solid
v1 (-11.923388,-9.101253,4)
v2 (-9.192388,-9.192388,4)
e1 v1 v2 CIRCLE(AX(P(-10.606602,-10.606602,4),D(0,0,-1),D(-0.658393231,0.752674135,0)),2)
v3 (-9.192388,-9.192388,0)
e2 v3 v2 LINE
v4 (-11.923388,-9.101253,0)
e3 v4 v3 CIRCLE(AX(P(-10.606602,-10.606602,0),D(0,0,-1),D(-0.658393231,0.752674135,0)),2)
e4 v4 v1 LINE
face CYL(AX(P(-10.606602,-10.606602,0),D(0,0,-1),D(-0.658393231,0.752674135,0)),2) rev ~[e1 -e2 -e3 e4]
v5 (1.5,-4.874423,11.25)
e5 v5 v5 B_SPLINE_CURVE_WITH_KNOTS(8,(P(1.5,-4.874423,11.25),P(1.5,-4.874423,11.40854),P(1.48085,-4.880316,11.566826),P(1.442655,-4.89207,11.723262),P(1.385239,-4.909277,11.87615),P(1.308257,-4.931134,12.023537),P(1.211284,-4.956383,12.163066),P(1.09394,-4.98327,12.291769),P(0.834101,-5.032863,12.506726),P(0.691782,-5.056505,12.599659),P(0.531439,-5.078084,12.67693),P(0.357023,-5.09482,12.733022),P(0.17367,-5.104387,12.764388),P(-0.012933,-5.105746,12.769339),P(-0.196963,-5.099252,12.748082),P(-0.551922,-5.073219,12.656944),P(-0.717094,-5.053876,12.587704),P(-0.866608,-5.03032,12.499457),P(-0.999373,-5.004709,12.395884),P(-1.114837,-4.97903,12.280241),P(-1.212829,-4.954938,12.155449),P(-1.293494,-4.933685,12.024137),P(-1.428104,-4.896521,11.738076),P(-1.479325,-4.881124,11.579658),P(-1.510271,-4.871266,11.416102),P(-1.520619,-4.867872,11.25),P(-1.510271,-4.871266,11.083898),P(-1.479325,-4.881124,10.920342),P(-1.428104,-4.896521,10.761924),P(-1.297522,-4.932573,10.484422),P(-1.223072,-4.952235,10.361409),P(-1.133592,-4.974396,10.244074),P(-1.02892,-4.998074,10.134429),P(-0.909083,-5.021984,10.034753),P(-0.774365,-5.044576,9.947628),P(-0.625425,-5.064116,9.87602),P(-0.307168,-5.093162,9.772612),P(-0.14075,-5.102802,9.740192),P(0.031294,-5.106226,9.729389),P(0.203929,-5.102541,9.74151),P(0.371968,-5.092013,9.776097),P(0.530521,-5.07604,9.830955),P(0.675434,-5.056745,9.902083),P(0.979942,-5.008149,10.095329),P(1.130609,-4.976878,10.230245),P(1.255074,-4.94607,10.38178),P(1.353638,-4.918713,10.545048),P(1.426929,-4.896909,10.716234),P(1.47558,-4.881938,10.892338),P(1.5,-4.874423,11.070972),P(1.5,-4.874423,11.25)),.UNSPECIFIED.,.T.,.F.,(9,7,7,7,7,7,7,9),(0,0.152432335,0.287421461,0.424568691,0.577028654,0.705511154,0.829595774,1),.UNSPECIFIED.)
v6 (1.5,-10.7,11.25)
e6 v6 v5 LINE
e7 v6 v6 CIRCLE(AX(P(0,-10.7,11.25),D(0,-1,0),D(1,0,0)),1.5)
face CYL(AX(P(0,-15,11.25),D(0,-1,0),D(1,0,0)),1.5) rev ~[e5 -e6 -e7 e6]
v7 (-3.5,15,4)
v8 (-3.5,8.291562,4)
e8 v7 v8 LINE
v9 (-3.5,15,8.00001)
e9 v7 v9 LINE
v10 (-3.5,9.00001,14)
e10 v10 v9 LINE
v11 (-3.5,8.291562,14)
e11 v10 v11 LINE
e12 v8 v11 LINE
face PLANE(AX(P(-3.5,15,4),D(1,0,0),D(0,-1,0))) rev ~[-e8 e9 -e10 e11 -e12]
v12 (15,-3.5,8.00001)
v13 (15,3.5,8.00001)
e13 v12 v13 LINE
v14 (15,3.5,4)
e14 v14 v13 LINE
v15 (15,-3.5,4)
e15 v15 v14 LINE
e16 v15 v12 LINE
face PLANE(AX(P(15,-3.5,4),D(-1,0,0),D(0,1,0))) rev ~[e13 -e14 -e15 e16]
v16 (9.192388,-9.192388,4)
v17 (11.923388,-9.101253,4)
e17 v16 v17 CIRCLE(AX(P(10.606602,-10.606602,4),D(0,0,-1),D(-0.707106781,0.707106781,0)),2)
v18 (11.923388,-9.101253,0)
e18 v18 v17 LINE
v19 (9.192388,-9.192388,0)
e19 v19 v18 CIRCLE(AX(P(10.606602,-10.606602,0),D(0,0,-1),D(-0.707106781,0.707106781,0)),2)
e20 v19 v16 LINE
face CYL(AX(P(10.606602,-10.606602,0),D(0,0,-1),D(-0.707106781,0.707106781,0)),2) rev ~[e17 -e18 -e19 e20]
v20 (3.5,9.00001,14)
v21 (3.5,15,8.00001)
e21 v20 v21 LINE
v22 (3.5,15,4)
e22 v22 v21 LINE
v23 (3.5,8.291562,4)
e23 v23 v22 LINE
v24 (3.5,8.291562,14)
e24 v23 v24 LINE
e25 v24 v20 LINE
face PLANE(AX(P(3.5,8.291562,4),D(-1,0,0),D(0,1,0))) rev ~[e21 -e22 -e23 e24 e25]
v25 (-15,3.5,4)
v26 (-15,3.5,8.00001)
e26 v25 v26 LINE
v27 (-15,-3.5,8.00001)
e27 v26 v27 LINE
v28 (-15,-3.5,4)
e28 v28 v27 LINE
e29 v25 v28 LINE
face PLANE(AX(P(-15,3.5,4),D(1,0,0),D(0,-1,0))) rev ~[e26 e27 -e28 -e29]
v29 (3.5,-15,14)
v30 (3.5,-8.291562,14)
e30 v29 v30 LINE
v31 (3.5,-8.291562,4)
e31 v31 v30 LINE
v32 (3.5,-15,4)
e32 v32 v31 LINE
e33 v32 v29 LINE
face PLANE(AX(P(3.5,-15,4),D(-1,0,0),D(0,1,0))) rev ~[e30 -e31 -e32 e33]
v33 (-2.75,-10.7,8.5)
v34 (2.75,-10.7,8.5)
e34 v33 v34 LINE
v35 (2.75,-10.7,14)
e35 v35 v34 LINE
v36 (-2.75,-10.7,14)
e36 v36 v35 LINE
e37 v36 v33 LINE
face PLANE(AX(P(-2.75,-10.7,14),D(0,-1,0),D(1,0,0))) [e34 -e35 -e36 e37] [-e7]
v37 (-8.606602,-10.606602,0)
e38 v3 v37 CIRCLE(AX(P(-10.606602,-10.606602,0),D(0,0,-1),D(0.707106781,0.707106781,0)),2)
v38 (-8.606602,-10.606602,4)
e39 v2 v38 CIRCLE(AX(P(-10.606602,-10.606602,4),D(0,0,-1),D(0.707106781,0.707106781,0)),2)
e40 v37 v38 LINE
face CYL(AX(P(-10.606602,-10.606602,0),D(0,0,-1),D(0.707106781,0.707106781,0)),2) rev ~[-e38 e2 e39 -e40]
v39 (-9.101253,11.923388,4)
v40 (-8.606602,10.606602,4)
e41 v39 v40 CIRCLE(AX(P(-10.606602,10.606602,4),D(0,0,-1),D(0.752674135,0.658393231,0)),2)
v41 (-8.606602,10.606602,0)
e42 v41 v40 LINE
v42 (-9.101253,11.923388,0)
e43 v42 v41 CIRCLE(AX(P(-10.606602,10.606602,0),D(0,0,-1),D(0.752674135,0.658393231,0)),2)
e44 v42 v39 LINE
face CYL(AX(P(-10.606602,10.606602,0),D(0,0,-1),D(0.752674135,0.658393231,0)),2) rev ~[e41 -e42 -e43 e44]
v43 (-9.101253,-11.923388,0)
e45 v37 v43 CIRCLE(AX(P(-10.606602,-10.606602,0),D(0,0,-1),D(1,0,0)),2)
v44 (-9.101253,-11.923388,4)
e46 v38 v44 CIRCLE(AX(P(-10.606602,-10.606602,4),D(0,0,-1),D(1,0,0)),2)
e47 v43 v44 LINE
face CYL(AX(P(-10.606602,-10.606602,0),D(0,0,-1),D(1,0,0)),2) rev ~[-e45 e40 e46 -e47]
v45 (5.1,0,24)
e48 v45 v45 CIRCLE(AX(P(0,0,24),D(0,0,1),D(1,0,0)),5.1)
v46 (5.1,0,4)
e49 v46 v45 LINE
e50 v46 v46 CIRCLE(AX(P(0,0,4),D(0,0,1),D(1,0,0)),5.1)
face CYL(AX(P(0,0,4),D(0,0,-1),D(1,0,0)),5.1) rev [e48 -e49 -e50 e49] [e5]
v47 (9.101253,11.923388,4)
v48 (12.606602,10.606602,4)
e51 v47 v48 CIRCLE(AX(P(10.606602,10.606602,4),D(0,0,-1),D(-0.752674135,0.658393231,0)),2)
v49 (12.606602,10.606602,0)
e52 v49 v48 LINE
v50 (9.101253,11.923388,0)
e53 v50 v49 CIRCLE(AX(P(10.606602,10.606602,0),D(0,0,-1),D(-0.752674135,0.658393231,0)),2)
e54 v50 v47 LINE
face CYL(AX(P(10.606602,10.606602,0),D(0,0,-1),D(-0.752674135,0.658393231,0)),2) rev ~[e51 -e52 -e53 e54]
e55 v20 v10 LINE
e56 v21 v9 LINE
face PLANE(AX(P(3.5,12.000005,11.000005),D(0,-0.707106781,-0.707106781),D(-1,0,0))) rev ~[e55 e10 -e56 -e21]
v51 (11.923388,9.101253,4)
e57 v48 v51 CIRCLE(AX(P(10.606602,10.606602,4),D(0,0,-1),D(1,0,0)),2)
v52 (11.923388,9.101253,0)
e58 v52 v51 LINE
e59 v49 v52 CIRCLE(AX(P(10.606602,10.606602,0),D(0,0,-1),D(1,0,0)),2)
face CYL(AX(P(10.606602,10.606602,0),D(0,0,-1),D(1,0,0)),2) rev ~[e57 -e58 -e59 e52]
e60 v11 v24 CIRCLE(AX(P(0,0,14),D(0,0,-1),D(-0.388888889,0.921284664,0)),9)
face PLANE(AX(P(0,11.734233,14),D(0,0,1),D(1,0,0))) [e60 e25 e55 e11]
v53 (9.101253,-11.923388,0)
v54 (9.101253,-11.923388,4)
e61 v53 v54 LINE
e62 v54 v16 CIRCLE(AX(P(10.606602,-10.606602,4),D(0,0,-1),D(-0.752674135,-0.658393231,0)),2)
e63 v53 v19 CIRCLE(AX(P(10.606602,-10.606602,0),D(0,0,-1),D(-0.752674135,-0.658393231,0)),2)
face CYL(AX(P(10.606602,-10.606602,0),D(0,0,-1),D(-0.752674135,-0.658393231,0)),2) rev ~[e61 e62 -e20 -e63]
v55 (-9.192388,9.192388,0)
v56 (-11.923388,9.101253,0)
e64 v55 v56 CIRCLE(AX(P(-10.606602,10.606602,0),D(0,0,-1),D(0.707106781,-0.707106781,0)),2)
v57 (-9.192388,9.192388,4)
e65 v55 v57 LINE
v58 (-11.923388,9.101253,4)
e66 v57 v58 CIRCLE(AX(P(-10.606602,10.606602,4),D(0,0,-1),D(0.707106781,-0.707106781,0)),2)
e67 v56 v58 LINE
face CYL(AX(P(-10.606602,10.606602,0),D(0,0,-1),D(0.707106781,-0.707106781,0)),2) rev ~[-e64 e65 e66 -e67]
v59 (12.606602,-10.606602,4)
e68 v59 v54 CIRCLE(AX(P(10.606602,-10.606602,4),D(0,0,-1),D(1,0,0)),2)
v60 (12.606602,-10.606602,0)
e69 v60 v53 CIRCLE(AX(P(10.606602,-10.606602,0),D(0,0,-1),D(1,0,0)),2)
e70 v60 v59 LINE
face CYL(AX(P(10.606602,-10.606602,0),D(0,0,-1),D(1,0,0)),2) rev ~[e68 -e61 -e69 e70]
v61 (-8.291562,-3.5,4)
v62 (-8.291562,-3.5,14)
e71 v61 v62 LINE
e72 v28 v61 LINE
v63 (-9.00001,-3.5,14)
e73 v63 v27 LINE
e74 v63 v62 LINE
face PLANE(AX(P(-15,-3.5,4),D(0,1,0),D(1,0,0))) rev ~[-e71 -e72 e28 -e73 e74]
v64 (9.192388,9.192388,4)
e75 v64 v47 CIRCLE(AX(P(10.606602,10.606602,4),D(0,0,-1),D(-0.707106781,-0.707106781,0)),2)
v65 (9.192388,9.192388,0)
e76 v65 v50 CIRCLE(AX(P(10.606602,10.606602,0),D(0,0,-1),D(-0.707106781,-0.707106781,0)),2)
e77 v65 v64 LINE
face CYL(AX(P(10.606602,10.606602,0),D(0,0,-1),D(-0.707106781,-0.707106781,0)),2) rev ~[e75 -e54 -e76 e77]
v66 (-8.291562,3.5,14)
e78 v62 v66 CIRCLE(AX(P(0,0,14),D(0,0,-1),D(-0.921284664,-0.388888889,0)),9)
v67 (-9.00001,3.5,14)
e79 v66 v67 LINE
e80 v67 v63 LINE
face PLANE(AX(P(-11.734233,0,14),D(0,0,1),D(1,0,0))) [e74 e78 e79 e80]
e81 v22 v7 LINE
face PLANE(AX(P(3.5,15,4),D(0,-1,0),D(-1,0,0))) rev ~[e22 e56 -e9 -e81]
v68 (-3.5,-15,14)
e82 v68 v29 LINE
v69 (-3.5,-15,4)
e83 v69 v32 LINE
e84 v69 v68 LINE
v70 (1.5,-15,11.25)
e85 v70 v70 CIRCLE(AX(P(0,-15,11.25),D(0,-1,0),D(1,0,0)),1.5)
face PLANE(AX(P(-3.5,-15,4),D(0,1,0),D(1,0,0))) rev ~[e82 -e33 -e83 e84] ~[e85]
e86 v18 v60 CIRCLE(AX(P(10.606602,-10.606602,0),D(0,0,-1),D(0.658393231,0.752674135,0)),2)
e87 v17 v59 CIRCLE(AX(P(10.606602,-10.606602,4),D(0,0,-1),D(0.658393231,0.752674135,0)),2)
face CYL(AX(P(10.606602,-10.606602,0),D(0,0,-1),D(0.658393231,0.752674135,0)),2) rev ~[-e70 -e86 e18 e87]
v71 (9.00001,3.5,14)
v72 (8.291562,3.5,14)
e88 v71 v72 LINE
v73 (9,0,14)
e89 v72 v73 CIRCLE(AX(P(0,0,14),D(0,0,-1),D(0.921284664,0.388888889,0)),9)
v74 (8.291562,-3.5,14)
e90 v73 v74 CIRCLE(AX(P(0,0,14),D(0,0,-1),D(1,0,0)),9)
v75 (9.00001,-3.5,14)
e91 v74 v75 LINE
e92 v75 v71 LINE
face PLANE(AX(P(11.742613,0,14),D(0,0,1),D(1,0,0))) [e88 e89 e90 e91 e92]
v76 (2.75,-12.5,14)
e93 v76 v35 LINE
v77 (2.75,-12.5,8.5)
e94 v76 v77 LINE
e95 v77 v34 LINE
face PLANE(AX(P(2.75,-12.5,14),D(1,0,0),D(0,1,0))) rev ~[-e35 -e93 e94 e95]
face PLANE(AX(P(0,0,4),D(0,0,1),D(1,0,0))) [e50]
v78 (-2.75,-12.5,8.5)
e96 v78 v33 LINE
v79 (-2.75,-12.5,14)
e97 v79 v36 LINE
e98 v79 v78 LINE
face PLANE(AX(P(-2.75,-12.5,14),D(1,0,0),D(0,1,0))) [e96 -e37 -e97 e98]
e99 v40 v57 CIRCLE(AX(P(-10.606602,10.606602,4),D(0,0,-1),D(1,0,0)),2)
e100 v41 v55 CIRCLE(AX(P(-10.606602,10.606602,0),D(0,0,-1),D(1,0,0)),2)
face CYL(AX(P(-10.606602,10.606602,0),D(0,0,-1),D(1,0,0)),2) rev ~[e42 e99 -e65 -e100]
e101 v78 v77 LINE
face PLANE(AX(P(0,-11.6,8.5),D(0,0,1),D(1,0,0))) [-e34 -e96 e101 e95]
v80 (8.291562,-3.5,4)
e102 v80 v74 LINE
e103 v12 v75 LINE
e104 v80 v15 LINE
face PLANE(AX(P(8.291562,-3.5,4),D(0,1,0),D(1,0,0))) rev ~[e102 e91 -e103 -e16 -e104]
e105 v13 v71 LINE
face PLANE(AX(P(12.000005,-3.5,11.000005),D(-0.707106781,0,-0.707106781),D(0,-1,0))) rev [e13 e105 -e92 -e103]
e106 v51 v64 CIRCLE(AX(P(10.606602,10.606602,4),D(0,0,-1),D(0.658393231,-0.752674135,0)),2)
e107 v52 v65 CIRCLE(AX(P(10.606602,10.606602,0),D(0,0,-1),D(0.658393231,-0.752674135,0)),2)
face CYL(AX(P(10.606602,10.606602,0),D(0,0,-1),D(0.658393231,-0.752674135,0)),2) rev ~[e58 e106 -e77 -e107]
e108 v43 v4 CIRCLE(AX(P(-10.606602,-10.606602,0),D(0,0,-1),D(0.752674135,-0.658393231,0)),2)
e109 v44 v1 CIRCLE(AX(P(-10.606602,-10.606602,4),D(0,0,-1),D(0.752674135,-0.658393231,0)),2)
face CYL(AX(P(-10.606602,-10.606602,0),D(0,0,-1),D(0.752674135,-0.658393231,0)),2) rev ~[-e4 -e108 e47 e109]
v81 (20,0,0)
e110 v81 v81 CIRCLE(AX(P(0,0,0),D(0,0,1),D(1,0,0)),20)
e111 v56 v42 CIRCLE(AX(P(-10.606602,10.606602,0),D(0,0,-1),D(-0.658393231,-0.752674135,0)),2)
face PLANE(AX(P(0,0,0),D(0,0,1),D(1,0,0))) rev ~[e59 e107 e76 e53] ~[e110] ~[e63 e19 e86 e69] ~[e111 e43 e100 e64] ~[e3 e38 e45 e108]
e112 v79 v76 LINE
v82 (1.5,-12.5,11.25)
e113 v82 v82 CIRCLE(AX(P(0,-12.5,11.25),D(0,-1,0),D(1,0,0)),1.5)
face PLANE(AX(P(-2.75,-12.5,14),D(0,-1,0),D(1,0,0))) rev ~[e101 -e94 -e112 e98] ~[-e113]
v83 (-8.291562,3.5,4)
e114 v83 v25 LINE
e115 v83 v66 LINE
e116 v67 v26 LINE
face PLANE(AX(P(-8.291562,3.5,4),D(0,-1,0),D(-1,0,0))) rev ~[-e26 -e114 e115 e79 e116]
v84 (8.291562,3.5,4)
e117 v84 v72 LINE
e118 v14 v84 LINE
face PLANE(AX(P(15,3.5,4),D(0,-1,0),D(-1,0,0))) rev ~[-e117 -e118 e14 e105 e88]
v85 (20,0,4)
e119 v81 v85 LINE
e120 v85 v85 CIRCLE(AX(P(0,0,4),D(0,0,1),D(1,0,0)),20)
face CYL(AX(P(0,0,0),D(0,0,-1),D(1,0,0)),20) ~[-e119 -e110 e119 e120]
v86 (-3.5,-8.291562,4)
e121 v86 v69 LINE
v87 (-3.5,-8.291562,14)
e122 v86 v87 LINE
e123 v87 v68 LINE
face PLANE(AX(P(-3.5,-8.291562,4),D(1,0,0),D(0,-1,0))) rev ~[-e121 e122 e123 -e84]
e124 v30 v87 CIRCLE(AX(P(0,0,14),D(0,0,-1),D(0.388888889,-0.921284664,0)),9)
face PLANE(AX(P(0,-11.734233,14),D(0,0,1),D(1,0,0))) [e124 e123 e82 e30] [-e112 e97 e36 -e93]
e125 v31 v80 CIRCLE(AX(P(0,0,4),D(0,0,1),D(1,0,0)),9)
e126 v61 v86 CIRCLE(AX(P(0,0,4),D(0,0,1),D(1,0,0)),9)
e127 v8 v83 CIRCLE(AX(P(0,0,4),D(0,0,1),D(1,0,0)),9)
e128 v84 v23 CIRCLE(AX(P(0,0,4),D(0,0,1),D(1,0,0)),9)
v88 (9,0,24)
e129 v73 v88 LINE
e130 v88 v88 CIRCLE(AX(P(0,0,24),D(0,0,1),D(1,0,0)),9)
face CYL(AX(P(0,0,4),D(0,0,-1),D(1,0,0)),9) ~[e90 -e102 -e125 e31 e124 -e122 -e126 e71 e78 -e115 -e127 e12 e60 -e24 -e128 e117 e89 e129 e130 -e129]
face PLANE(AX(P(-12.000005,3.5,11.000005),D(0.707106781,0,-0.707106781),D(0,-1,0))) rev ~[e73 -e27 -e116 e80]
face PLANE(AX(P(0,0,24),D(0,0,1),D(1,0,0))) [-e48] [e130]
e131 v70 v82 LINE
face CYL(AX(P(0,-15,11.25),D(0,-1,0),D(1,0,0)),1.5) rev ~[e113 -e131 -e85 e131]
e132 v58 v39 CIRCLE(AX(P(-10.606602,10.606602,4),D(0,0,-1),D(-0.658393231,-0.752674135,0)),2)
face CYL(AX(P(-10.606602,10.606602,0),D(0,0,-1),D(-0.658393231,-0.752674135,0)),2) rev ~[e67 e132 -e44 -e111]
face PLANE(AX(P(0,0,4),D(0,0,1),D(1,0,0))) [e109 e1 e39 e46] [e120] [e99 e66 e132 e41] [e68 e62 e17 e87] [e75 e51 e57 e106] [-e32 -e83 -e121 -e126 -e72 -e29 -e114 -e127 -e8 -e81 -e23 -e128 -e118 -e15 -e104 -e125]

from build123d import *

# Parameters (mm, degrees)
F0_R      = 20
F1_DEPTH  = 4
F2_R      = 9
F2_R_2    = 5.1
F3_DEPTH  = 20
F5_DEPTH  = 10
F6_W      = 5.5
F6_H      = 1.8
F7_DEPTH  = 5.5
F8_R      = 1.5
F9_DEPTH  = 11
F10_SIZE  = 5.99999
F12_DEPTH = 25


# Not quite as in the source:
# - a fillet or chamfer is up to 0.001 mm smaller than in the source, because OpenCascade refuses the exact size


with BuildPart() as f1:
    # F0 (on Top) → F1 (new body)
    with BuildSketch(Plane.XY):
        Circle(F0_R)
    extrude(amount=F1_DEPTH)

    # F2 (on face) → F3 (join)
    with BuildSketch(Plane.XY.offset(4)):
        Circle(F2_R)
        Circle(F2_R_2, mode=Mode.SUBTRACT)
    extrude(amount=F3_DEPTH)

    # F4 (on face) → F5 (join)
    with BuildSketch(Plane.XY.offset(4)):
        with BuildLine():
            Line((-3.5, 15), (-3.5, 8.2915619759))
            ThreePointArc((-3.5, 8.2915619759), (0, 9), (3.5, 8.2915619759))
            Line((3.5, 8.2915619759), (3.5, 15))
            Line((3.5, 15), (-3.5, 15))
        make_face()
        with BuildLine():
            Line((15, 3.5), (8.2915619759, 3.5))
            ThreePointArc((8.2915619759, 3.5), (8.8211126788, 1.785489039), (9, 0))
            ThreePointArc((9, 0), (8.8211126788, -1.785489039), (8.2915619759, -3.5))
            Line((8.2915619759, -3.5), (15, -3.5))
            Line((15, -3.5), (15, 3.5))
        make_face()
        with BuildLine():
            Line((-8.2915619759, 3.5), (-15, 3.5))
            Line((-15, 3.5), (-15, -3.5))
            Line((-15, -3.5), (-8.2915619759, -3.5))
            ThreePointArc((-8.2915619759, -3.5), (-9, 0), (-8.2915619759, 3.5))
        make_face()
        with BuildLine():
            ThreePointArc((3.5, -8.2915619759), (0, -9), (-3.5, -8.2915619759))
            Line((-3.5, -8.2915619759), (-3.5, -15))
            Line((-3.5, -15), (3.5, -15))
            Line((3.5, -15), (3.5, -8.2915619759))
        make_face()
    extrude(amount=F5_DEPTH)

    # F6 (on face) → F7 (cut)
    with BuildSketch(Plane.XY.offset(14)):
        with Locations((0, -11.6)):
            Rectangle(F6_W, F6_H)
    extrude(amount=-F7_DEPTH, mode=Mode.SUBTRACT)

    # F8 (on face) → F9 (cut)
    with BuildSketch(Plane.XZ.offset(15)):
        with Locations((0, 11.25)):
            Circle(F8_R)
    extrude(amount=-F9_DEPTH, mode=Mode.SUBTRACT)

    # F10 (size 6 in the source; OpenCascade refuses exactly that, so slightly less here)
    f10_edges = [f1.edges().sort_by_distance(p)[0] for p in [
        (15, 0, 14),
        (0, 15, 14),
        (-15, 0, 14),
    ]]
    chamfer(f10_edges, length=F10_SIZE)

    # F11 (on face) → F12 (cut)
    with BuildSketch(Plane(origin=(0, 0, 0), x_dir=(1, 0, 0), z_dir=(0, 0, -1))):
        with BuildLine():
            ThreePointArc((-10.6066017178, 10.6066017178), (-9.8758984631, 11.2901120254), (-9.1012534477, 11.9233881795))
            ThreePointArc((-9.1012534477, 11.9233881795), (-12.0208152802, 12.0208152802), (-11.9233881795, 9.1012534477))
            ThreePointArc((-11.9233881795, 9.1012534477), (-11.2901120254, 9.8758984631), (-10.6066017178, 10.6066017178))
        make_face()
        with BuildLine():
            Line((-10.6066017178, 10.6066017178), (-9.1923881554, 9.1923881554))
            ThreePointArc((-9.1923881554, 9.1923881554), (-8.7588426528, 9.8412348531), (-8.6066017178, 10.6066017178))
            ThreePointArc((-8.6066017178, 10.6066017178), (-8.7343441847, 11.3099165335), (-9.1012534477, 11.9233881795))
            ThreePointArc((-9.1012534477, 11.9233881795), (-9.8758984631, 11.2901120254), (-10.6066017178, 10.6066017178))
        make_face()
        with BuildLine():
            ThreePointArc((-11.9233881795, 9.1012534477), (-10.5398979419, 8.6077143757), (-9.1923881554, 9.1923881554))
            Line((-9.1923881554, 9.1923881554), (-10.6066017178, 10.6066017178))
            ThreePointArc((-10.6066017178, 10.6066017178), (-11.2901120254, 9.8758984631), (-11.9233881795, 9.1012534477))
        make_face()
        with BuildLine():
            ThreePointArc((9.1923881554, 9.1923881554), (10.5398979419, 8.6077143757), (11.9233881795, 9.1012534477))
            ThreePointArc((11.9233881795, 9.1012534477), (11.2901120254, 9.8758984631), (10.6066017178, 10.6066017178))
            Line((10.6066017178, 10.6066017178), (9.1923881554, 9.1923881554))
        make_face()
        with BuildLine():
            ThreePointArc((10.6066017178, 10.6066017178), (11.2901120254, 9.8758984631), (11.9233881795, 9.1012534477))
            ThreePointArc((11.9233881795, 9.1012534477), (12.427806391, 9.7800343955), (12.6066017178, 10.6066017178))
            ThreePointArc((12.6066017178, 10.6066017178), (11.3099165335, 12.4788592508), (9.1012534477, 11.9233881795))
            ThreePointArc((9.1012534477, 11.9233881795), (9.8758984631, 11.2901120254), (10.6066017178, 10.6066017178))
        make_face()
        with BuildLine():
            Line((9.1923881554, 9.1923881554), (10.6066017178, 10.6066017178))
            ThreePointArc((10.6066017178, 10.6066017178), (9.8758984631, 11.2901120254), (9.1012534477, 11.9233881795))
            ThreePointArc((9.1012534477, 11.9233881795), (8.6077143757, 10.5398979419), (9.1923881554, 9.1923881554))
        make_face()
        with BuildLine():
            ThreePointArc((12.6066017178, -10.6066017178), (12.427806391, -9.7800343955), (11.9233881795, -9.1012534477))
            ThreePointArc((11.9233881795, -9.1012534477), (11.2901120254, -9.8758984631), (10.6066017178, -10.6066017178))
            ThreePointArc((10.6066017178, -10.6066017178), (9.8758984631, -11.2901120254), (9.1012534477, -11.9233881795))
            ThreePointArc((9.1012534477, -11.9233881795), (11.3099165335, -12.4788592508), (12.6066017178, -10.6066017178))
        make_face()
        with BuildLine():
            ThreePointArc((10.6066017178, -10.6066017178), (11.2901120254, -9.8758984631), (11.9233881795, -9.1012534477))
            ThreePointArc((11.9233881795, -9.1012534477), (10.5398979419, -8.6077143757), (9.1923881554, -9.1923881554))
            Line((9.1923881554, -9.1923881554), (10.6066017178, -10.6066017178))
        make_face()
        with BuildLine():
            ThreePointArc((9.1012534477, -11.9233881795), (9.8758984631, -11.2901120254), (10.6066017178, -10.6066017178))
            Line((10.6066017178, -10.6066017178), (9.1923881554, -9.1923881554))
            ThreePointArc((9.1923881554, -9.1923881554), (8.6077143757, -10.5398979419), (9.1012534477, -11.9233881795))
        make_face()
        with BuildLine():
            ThreePointArc((-11.9233881795, -9.1012534477), (-12.0208152802, -12.0208152802), (-9.1012534477, -11.9233881795))
            ThreePointArc((-9.1012534477, -11.9233881795), (-9.8758984631, -11.2901120254), (-10.6066017178, -10.6066017178))
            ThreePointArc((-10.6066017178, -10.6066017178), (-11.2901120254, -9.8758984631), (-11.9233881795, -9.1012534477))
        make_face()
        with BuildLine():
            ThreePointArc((-8.6066017178, -10.6066017178), (-8.7588426528, -9.8412348531), (-9.1923881554, -9.1923881554))
            Line((-9.1923881554, -9.1923881554), (-10.6066017178, -10.6066017178))
            ThreePointArc((-10.6066017178, -10.6066017178), (-9.8758984631, -11.2901120254), (-9.1012534477, -11.9233881795))
            ThreePointArc((-9.1012534477, -11.9233881795), (-8.7343441847, -11.3099165335), (-8.6066017178, -10.6066017178))
        make_face()
        with BuildLine():
            Line((-10.6066017178, -10.6066017178), (-9.1923881554, -9.1923881554))
            ThreePointArc((-9.1923881554, -9.1923881554), (-10.5398979419, -8.6077143757), (-11.9233881795, -9.1012534477))
            ThreePointArc((-11.9233881795, -9.1012534477), (-11.2901120254, -9.8758984631), (-10.6066017178, -10.6066017178))
        make_face()
    extrude(amount=-F12_DEPTH, mode=Mode.SUBTRACT)


solid = f1.part
